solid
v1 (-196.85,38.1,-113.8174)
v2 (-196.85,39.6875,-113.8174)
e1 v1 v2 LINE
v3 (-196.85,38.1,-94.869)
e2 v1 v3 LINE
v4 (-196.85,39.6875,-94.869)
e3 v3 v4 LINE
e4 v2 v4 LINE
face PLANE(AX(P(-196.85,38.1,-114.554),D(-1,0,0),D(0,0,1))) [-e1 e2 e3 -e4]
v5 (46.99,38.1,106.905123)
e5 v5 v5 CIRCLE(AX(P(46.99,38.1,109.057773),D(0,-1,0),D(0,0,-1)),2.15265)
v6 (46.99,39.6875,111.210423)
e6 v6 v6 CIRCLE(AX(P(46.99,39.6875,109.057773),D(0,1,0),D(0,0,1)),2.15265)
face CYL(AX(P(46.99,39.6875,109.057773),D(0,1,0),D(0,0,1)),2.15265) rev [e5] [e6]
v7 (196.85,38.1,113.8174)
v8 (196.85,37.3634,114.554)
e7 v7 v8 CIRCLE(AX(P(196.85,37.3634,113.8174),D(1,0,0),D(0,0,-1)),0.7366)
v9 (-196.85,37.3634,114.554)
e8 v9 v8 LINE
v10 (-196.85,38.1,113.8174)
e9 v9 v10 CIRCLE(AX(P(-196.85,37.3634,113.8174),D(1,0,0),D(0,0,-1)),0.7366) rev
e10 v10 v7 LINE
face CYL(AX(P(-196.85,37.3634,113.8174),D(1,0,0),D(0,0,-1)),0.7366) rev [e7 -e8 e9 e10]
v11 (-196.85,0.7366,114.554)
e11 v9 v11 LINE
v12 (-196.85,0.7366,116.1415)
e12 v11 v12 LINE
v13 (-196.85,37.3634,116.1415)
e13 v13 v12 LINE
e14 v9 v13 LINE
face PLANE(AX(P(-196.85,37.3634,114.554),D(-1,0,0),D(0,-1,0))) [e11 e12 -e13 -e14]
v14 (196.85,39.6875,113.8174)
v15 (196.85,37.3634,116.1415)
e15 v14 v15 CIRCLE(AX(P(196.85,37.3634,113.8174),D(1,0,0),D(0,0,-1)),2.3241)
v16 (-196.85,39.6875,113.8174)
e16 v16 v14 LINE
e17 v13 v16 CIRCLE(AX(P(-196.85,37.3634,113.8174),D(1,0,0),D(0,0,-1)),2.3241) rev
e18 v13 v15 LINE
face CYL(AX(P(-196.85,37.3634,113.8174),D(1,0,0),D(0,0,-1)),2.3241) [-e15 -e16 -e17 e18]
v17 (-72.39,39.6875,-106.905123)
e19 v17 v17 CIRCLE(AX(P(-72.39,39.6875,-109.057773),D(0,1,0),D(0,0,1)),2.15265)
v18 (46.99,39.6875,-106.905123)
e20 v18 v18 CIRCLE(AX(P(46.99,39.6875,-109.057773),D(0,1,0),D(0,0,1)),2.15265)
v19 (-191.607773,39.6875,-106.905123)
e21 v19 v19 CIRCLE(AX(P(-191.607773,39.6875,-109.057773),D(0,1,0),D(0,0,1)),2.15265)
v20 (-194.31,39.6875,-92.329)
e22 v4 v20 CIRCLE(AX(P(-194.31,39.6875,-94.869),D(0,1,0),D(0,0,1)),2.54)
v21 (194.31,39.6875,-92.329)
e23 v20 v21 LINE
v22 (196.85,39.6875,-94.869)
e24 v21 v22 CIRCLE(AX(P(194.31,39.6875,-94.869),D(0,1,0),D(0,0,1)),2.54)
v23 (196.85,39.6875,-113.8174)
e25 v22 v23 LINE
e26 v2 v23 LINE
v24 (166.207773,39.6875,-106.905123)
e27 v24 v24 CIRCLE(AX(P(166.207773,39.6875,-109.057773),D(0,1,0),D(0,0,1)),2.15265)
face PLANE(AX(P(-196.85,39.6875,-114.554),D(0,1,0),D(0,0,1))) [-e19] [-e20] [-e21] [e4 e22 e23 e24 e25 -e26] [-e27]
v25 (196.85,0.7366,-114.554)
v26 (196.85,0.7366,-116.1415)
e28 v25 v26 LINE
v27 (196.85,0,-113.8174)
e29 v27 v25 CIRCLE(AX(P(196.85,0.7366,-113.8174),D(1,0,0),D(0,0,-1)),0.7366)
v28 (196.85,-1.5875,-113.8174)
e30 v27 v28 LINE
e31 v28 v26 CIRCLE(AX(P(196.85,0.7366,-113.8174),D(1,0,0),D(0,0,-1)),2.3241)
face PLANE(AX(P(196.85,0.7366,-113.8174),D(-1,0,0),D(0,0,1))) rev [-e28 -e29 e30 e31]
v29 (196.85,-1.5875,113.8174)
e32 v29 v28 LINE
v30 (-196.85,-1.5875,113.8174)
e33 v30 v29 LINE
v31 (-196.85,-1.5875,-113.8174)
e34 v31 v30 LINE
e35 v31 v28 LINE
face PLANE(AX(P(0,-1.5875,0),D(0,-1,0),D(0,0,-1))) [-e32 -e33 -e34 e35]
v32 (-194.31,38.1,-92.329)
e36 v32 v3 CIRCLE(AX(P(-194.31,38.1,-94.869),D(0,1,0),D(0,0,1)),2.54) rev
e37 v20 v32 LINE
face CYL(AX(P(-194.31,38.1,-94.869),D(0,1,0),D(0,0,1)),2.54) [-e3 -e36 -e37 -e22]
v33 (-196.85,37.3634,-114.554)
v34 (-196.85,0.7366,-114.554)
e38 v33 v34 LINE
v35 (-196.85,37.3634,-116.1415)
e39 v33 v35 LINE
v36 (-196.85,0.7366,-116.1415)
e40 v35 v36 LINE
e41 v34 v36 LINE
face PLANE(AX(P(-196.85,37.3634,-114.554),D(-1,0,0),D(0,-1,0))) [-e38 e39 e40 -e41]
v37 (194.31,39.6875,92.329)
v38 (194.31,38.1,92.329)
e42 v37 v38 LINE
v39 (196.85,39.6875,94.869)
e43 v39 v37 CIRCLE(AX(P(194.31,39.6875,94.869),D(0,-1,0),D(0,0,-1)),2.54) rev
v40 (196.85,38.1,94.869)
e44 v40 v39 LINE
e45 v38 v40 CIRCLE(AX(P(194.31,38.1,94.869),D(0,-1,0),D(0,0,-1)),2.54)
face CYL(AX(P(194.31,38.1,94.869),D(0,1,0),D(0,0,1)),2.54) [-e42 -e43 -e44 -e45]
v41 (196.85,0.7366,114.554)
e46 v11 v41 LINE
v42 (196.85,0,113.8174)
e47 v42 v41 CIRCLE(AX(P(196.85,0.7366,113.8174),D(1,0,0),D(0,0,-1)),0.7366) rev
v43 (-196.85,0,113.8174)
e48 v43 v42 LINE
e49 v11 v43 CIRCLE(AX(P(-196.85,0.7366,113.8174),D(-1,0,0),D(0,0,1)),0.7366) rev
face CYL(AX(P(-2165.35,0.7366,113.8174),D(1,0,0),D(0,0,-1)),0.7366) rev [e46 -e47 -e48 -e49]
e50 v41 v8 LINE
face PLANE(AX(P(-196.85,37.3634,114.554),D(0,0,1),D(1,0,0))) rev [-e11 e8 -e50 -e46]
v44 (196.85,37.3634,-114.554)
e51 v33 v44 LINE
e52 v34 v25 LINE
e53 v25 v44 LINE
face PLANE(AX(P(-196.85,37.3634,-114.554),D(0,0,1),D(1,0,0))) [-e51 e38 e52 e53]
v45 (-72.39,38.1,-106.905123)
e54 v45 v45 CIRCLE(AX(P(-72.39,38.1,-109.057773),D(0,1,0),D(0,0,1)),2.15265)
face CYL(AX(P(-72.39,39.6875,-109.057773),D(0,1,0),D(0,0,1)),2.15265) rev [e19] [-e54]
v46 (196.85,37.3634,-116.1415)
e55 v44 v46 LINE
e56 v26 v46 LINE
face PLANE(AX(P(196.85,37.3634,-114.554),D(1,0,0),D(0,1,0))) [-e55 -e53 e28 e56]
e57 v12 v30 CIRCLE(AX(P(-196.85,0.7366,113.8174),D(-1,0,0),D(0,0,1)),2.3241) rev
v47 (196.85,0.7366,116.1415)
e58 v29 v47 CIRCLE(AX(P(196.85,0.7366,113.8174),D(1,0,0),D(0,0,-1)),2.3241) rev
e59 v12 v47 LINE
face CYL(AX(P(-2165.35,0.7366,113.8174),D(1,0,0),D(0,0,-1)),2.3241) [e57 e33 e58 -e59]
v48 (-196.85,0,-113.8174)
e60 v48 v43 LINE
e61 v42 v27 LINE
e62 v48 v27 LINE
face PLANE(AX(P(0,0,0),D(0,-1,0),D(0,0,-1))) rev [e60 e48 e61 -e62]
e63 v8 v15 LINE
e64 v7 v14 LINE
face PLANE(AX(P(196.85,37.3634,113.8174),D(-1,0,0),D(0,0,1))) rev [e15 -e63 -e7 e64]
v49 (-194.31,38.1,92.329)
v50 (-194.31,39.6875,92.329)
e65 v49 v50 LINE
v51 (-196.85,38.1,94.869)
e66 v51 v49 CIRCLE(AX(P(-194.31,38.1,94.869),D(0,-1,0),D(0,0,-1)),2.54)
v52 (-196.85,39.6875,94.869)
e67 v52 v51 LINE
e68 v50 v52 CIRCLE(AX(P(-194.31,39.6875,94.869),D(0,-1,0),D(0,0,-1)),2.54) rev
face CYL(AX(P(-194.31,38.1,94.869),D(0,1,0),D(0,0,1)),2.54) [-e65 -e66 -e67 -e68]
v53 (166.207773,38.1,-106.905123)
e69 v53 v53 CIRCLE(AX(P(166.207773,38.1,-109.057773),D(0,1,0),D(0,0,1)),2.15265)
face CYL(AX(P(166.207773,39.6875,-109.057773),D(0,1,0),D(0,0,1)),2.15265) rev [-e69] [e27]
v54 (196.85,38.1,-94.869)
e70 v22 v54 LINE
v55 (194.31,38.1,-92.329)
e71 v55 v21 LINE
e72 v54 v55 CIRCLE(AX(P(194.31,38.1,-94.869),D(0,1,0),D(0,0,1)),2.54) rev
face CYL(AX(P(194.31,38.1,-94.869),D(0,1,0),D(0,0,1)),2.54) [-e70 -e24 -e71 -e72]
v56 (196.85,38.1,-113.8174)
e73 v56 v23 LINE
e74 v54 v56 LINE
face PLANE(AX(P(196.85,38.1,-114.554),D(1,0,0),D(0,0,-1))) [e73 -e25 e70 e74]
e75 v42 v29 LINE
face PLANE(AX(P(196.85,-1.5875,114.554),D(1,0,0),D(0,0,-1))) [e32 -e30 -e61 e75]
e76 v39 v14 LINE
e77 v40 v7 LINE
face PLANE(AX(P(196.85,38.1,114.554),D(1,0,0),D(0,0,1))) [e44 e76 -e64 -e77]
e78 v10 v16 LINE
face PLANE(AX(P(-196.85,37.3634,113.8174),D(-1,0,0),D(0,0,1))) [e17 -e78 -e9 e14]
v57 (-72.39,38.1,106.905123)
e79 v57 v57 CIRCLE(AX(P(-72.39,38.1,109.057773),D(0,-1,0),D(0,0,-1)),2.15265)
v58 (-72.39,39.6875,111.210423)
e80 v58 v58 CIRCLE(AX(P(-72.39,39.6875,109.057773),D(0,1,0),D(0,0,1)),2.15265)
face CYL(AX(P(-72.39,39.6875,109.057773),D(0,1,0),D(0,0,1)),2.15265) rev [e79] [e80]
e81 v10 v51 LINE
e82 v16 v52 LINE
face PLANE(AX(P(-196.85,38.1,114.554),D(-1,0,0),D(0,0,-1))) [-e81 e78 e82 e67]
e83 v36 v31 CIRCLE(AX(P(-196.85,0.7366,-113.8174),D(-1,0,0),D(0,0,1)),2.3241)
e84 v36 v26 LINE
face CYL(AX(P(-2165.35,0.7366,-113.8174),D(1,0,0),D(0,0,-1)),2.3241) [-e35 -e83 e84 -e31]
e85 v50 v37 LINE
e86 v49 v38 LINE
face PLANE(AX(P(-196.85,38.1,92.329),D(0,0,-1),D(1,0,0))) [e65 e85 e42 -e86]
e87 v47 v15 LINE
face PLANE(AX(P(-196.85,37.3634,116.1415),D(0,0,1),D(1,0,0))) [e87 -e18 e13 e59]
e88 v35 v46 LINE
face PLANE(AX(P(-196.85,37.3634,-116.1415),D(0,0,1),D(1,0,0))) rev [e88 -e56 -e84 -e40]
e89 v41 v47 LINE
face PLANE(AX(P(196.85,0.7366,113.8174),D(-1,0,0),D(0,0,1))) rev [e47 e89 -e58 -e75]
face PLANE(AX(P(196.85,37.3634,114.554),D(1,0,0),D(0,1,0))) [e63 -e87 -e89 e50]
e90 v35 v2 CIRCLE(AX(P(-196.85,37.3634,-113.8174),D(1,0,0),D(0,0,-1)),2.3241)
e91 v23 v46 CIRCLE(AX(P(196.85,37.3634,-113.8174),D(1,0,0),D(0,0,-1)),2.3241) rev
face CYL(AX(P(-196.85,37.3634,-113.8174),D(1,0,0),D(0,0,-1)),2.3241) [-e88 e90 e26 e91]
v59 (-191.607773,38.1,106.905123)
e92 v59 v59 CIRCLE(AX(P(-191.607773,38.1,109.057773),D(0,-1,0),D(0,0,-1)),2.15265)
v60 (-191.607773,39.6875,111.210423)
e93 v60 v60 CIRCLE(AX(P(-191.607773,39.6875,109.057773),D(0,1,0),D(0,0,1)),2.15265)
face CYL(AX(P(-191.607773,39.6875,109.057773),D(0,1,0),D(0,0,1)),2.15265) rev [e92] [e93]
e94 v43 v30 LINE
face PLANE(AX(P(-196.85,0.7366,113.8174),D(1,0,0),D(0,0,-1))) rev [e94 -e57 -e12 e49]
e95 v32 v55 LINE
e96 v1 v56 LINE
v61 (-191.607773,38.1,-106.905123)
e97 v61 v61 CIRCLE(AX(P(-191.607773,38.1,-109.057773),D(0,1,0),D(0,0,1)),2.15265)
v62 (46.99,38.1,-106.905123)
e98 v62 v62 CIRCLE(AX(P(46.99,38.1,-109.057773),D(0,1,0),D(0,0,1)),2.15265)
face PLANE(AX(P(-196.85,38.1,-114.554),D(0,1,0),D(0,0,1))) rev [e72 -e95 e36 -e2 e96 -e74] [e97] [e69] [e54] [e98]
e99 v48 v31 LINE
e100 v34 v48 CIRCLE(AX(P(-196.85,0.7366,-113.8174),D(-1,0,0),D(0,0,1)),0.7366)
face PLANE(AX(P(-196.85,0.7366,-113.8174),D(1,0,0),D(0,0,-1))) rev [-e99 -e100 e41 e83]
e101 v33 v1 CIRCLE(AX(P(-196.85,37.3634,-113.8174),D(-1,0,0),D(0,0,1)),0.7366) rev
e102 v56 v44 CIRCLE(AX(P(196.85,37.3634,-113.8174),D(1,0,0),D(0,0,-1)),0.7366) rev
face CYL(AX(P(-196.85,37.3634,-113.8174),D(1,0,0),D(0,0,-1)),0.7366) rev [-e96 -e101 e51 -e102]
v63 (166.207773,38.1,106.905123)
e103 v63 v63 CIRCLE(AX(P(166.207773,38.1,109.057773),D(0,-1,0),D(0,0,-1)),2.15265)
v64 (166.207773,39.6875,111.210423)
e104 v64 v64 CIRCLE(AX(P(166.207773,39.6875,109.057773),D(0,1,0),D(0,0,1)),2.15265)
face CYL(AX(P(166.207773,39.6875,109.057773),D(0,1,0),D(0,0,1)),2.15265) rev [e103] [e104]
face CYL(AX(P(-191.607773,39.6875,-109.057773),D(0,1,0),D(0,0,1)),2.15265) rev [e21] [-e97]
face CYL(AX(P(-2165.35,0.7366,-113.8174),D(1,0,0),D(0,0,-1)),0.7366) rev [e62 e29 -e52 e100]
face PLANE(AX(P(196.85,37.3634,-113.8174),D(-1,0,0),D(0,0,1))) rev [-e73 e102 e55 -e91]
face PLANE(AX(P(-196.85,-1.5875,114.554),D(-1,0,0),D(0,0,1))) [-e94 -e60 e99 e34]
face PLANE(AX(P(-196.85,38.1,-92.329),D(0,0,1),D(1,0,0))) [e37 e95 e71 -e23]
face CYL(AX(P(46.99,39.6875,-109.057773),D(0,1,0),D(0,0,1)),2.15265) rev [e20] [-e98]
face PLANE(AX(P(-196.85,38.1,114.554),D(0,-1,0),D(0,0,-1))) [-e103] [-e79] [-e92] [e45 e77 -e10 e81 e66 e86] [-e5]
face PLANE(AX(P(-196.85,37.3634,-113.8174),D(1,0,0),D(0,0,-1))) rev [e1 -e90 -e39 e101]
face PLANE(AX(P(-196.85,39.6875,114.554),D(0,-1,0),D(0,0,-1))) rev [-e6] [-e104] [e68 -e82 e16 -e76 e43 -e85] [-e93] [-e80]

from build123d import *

# Parameters (mm, degrees)
SKETCH1_W                 = 393.7
SKETCH1_H                 = 229.108
BASE_FLANGE1_DEPTH        = 1.5875
MITER_START               = -196.85
MITER_FLANGE1_DEPTH       = 393.7
MITER_FLANGE1_2_DEPTH     = 393.7
F_8_CLEARANCE_HOLE1_D     = 4.3053
F_8_CLEARANCE_HOLE1_DEPTH = 1.5875
FILLET1_R                 = 2.54


# Read off the part's stored shape, not the designer's step: Miter Flange1
# Sheet-metal steps are written as plain solids
with BuildPart() as part:
    # Sketch1 → Base-Flange1 (new body)
    with BuildSketch(Plane(origin=(0, 0, 0), x_dir=(1, 0, 0), z_dir=(0, 1, 0))):
        Rectangle(SKETCH1_W, SKETCH1_H)
    extrude(amount=-BASE_FLANGE1_DEPTH)

    # Miter Flange1 outline → Miter Flange1 (cut)
    with BuildSketch(Plane.YZ.offset(MITER_START)):
        with BuildLine():
            Line((-1.5875, -114.554), (-1.467682479, -114.554))
            ThreePointArc((-1.467682479, -114.554), (-1.557350056, -114.190540657), (-1.5875, -113.8174))
            Line((-1.5875, -113.8174), (-1.5875, -114.554))
        make_face()
    miter_flange1 = extrude(amount=MITER_FLANGE1_DEPTH, mode=Mode.SUBTRACT)

    # Miter Flange1 2 outline → Miter Flange1 2 (add)
    with BuildSketch(Plane.YZ.offset(MITER_START)):
        with BuildLine():
            Line((39.6875, -113.8174), (39.6875, -92.329))
            Line((39.6875, -92.329), (38.1, -92.329))
            Line((38.1, -92.329), (38.1, -113.8174))
            ThreePointArc((38.1, -113.8174), (37.884254855, -114.338254855), (37.3634, -114.554))
            Line((37.3634, -114.554), (0.7366, -114.554))
            ThreePointArc((0.7366, -114.554), (0.215745145, -114.338254855), (0, -113.8174))
            Line((0, -113.8174), (0, -114.554))
            Line((0, -114.554), (-1.467682479, -114.554))
            ThreePointArc((-1.467682479, -114.554), (-0.621617352, -115.703317929), (0.7366, -116.1415))
            Line((0.7366, -116.1415), (37.3634, -116.1415))
            ThreePointArc((37.3634, -116.1415), (39.00678687, -115.46078687), (39.6875, -113.8174))
        make_face()
    miter_flange1_2 = extrude(amount=MITER_FLANGE1_2_DEPTH)

    # Mirror1: Miter Flange1, Miter Flange1 2 across plane
    add(miter_flange1.mirror(Plane.XY), mode=Mode.SUBTRACT)
    add(miter_flange1_2.mirror(Plane.XY))

    # #8 Clearance Hole1
    with Locations(Plane(origin=(0, 39.6875, 0), x_dir=(1, 0, 0), z_dir=(0, 1, 0))):
        with Locations((166.207772673, -109.057772673), (46.99, -109.057772673), (-72.39, -109.057772673), (-191.607772673, -109.057772673), (-191.607772673, 109.057772673), (-72.39, 109.057772673), (46.99, 109.057772673), (166.207772673, 109.057772673)):
            Hole(F_8_CLEARANCE_HOLE1_D / 2, depth=F_8_CLEARANCE_HOLE1_DEPTH)

    # Fillet1
    fillet1_edges = [part.edges().sort_by_distance(p)[0] for p in [
        (-196.85, 38.89375, -92.329),
        (196.85, 38.89375, -92.329),
        (-196.85, 38.89375, 92.329),
        (196.85, 38.89375, 92.329),
    ]]
    fillet(fillet1_edges, radius=FILLET1_R)


solid = part.part
